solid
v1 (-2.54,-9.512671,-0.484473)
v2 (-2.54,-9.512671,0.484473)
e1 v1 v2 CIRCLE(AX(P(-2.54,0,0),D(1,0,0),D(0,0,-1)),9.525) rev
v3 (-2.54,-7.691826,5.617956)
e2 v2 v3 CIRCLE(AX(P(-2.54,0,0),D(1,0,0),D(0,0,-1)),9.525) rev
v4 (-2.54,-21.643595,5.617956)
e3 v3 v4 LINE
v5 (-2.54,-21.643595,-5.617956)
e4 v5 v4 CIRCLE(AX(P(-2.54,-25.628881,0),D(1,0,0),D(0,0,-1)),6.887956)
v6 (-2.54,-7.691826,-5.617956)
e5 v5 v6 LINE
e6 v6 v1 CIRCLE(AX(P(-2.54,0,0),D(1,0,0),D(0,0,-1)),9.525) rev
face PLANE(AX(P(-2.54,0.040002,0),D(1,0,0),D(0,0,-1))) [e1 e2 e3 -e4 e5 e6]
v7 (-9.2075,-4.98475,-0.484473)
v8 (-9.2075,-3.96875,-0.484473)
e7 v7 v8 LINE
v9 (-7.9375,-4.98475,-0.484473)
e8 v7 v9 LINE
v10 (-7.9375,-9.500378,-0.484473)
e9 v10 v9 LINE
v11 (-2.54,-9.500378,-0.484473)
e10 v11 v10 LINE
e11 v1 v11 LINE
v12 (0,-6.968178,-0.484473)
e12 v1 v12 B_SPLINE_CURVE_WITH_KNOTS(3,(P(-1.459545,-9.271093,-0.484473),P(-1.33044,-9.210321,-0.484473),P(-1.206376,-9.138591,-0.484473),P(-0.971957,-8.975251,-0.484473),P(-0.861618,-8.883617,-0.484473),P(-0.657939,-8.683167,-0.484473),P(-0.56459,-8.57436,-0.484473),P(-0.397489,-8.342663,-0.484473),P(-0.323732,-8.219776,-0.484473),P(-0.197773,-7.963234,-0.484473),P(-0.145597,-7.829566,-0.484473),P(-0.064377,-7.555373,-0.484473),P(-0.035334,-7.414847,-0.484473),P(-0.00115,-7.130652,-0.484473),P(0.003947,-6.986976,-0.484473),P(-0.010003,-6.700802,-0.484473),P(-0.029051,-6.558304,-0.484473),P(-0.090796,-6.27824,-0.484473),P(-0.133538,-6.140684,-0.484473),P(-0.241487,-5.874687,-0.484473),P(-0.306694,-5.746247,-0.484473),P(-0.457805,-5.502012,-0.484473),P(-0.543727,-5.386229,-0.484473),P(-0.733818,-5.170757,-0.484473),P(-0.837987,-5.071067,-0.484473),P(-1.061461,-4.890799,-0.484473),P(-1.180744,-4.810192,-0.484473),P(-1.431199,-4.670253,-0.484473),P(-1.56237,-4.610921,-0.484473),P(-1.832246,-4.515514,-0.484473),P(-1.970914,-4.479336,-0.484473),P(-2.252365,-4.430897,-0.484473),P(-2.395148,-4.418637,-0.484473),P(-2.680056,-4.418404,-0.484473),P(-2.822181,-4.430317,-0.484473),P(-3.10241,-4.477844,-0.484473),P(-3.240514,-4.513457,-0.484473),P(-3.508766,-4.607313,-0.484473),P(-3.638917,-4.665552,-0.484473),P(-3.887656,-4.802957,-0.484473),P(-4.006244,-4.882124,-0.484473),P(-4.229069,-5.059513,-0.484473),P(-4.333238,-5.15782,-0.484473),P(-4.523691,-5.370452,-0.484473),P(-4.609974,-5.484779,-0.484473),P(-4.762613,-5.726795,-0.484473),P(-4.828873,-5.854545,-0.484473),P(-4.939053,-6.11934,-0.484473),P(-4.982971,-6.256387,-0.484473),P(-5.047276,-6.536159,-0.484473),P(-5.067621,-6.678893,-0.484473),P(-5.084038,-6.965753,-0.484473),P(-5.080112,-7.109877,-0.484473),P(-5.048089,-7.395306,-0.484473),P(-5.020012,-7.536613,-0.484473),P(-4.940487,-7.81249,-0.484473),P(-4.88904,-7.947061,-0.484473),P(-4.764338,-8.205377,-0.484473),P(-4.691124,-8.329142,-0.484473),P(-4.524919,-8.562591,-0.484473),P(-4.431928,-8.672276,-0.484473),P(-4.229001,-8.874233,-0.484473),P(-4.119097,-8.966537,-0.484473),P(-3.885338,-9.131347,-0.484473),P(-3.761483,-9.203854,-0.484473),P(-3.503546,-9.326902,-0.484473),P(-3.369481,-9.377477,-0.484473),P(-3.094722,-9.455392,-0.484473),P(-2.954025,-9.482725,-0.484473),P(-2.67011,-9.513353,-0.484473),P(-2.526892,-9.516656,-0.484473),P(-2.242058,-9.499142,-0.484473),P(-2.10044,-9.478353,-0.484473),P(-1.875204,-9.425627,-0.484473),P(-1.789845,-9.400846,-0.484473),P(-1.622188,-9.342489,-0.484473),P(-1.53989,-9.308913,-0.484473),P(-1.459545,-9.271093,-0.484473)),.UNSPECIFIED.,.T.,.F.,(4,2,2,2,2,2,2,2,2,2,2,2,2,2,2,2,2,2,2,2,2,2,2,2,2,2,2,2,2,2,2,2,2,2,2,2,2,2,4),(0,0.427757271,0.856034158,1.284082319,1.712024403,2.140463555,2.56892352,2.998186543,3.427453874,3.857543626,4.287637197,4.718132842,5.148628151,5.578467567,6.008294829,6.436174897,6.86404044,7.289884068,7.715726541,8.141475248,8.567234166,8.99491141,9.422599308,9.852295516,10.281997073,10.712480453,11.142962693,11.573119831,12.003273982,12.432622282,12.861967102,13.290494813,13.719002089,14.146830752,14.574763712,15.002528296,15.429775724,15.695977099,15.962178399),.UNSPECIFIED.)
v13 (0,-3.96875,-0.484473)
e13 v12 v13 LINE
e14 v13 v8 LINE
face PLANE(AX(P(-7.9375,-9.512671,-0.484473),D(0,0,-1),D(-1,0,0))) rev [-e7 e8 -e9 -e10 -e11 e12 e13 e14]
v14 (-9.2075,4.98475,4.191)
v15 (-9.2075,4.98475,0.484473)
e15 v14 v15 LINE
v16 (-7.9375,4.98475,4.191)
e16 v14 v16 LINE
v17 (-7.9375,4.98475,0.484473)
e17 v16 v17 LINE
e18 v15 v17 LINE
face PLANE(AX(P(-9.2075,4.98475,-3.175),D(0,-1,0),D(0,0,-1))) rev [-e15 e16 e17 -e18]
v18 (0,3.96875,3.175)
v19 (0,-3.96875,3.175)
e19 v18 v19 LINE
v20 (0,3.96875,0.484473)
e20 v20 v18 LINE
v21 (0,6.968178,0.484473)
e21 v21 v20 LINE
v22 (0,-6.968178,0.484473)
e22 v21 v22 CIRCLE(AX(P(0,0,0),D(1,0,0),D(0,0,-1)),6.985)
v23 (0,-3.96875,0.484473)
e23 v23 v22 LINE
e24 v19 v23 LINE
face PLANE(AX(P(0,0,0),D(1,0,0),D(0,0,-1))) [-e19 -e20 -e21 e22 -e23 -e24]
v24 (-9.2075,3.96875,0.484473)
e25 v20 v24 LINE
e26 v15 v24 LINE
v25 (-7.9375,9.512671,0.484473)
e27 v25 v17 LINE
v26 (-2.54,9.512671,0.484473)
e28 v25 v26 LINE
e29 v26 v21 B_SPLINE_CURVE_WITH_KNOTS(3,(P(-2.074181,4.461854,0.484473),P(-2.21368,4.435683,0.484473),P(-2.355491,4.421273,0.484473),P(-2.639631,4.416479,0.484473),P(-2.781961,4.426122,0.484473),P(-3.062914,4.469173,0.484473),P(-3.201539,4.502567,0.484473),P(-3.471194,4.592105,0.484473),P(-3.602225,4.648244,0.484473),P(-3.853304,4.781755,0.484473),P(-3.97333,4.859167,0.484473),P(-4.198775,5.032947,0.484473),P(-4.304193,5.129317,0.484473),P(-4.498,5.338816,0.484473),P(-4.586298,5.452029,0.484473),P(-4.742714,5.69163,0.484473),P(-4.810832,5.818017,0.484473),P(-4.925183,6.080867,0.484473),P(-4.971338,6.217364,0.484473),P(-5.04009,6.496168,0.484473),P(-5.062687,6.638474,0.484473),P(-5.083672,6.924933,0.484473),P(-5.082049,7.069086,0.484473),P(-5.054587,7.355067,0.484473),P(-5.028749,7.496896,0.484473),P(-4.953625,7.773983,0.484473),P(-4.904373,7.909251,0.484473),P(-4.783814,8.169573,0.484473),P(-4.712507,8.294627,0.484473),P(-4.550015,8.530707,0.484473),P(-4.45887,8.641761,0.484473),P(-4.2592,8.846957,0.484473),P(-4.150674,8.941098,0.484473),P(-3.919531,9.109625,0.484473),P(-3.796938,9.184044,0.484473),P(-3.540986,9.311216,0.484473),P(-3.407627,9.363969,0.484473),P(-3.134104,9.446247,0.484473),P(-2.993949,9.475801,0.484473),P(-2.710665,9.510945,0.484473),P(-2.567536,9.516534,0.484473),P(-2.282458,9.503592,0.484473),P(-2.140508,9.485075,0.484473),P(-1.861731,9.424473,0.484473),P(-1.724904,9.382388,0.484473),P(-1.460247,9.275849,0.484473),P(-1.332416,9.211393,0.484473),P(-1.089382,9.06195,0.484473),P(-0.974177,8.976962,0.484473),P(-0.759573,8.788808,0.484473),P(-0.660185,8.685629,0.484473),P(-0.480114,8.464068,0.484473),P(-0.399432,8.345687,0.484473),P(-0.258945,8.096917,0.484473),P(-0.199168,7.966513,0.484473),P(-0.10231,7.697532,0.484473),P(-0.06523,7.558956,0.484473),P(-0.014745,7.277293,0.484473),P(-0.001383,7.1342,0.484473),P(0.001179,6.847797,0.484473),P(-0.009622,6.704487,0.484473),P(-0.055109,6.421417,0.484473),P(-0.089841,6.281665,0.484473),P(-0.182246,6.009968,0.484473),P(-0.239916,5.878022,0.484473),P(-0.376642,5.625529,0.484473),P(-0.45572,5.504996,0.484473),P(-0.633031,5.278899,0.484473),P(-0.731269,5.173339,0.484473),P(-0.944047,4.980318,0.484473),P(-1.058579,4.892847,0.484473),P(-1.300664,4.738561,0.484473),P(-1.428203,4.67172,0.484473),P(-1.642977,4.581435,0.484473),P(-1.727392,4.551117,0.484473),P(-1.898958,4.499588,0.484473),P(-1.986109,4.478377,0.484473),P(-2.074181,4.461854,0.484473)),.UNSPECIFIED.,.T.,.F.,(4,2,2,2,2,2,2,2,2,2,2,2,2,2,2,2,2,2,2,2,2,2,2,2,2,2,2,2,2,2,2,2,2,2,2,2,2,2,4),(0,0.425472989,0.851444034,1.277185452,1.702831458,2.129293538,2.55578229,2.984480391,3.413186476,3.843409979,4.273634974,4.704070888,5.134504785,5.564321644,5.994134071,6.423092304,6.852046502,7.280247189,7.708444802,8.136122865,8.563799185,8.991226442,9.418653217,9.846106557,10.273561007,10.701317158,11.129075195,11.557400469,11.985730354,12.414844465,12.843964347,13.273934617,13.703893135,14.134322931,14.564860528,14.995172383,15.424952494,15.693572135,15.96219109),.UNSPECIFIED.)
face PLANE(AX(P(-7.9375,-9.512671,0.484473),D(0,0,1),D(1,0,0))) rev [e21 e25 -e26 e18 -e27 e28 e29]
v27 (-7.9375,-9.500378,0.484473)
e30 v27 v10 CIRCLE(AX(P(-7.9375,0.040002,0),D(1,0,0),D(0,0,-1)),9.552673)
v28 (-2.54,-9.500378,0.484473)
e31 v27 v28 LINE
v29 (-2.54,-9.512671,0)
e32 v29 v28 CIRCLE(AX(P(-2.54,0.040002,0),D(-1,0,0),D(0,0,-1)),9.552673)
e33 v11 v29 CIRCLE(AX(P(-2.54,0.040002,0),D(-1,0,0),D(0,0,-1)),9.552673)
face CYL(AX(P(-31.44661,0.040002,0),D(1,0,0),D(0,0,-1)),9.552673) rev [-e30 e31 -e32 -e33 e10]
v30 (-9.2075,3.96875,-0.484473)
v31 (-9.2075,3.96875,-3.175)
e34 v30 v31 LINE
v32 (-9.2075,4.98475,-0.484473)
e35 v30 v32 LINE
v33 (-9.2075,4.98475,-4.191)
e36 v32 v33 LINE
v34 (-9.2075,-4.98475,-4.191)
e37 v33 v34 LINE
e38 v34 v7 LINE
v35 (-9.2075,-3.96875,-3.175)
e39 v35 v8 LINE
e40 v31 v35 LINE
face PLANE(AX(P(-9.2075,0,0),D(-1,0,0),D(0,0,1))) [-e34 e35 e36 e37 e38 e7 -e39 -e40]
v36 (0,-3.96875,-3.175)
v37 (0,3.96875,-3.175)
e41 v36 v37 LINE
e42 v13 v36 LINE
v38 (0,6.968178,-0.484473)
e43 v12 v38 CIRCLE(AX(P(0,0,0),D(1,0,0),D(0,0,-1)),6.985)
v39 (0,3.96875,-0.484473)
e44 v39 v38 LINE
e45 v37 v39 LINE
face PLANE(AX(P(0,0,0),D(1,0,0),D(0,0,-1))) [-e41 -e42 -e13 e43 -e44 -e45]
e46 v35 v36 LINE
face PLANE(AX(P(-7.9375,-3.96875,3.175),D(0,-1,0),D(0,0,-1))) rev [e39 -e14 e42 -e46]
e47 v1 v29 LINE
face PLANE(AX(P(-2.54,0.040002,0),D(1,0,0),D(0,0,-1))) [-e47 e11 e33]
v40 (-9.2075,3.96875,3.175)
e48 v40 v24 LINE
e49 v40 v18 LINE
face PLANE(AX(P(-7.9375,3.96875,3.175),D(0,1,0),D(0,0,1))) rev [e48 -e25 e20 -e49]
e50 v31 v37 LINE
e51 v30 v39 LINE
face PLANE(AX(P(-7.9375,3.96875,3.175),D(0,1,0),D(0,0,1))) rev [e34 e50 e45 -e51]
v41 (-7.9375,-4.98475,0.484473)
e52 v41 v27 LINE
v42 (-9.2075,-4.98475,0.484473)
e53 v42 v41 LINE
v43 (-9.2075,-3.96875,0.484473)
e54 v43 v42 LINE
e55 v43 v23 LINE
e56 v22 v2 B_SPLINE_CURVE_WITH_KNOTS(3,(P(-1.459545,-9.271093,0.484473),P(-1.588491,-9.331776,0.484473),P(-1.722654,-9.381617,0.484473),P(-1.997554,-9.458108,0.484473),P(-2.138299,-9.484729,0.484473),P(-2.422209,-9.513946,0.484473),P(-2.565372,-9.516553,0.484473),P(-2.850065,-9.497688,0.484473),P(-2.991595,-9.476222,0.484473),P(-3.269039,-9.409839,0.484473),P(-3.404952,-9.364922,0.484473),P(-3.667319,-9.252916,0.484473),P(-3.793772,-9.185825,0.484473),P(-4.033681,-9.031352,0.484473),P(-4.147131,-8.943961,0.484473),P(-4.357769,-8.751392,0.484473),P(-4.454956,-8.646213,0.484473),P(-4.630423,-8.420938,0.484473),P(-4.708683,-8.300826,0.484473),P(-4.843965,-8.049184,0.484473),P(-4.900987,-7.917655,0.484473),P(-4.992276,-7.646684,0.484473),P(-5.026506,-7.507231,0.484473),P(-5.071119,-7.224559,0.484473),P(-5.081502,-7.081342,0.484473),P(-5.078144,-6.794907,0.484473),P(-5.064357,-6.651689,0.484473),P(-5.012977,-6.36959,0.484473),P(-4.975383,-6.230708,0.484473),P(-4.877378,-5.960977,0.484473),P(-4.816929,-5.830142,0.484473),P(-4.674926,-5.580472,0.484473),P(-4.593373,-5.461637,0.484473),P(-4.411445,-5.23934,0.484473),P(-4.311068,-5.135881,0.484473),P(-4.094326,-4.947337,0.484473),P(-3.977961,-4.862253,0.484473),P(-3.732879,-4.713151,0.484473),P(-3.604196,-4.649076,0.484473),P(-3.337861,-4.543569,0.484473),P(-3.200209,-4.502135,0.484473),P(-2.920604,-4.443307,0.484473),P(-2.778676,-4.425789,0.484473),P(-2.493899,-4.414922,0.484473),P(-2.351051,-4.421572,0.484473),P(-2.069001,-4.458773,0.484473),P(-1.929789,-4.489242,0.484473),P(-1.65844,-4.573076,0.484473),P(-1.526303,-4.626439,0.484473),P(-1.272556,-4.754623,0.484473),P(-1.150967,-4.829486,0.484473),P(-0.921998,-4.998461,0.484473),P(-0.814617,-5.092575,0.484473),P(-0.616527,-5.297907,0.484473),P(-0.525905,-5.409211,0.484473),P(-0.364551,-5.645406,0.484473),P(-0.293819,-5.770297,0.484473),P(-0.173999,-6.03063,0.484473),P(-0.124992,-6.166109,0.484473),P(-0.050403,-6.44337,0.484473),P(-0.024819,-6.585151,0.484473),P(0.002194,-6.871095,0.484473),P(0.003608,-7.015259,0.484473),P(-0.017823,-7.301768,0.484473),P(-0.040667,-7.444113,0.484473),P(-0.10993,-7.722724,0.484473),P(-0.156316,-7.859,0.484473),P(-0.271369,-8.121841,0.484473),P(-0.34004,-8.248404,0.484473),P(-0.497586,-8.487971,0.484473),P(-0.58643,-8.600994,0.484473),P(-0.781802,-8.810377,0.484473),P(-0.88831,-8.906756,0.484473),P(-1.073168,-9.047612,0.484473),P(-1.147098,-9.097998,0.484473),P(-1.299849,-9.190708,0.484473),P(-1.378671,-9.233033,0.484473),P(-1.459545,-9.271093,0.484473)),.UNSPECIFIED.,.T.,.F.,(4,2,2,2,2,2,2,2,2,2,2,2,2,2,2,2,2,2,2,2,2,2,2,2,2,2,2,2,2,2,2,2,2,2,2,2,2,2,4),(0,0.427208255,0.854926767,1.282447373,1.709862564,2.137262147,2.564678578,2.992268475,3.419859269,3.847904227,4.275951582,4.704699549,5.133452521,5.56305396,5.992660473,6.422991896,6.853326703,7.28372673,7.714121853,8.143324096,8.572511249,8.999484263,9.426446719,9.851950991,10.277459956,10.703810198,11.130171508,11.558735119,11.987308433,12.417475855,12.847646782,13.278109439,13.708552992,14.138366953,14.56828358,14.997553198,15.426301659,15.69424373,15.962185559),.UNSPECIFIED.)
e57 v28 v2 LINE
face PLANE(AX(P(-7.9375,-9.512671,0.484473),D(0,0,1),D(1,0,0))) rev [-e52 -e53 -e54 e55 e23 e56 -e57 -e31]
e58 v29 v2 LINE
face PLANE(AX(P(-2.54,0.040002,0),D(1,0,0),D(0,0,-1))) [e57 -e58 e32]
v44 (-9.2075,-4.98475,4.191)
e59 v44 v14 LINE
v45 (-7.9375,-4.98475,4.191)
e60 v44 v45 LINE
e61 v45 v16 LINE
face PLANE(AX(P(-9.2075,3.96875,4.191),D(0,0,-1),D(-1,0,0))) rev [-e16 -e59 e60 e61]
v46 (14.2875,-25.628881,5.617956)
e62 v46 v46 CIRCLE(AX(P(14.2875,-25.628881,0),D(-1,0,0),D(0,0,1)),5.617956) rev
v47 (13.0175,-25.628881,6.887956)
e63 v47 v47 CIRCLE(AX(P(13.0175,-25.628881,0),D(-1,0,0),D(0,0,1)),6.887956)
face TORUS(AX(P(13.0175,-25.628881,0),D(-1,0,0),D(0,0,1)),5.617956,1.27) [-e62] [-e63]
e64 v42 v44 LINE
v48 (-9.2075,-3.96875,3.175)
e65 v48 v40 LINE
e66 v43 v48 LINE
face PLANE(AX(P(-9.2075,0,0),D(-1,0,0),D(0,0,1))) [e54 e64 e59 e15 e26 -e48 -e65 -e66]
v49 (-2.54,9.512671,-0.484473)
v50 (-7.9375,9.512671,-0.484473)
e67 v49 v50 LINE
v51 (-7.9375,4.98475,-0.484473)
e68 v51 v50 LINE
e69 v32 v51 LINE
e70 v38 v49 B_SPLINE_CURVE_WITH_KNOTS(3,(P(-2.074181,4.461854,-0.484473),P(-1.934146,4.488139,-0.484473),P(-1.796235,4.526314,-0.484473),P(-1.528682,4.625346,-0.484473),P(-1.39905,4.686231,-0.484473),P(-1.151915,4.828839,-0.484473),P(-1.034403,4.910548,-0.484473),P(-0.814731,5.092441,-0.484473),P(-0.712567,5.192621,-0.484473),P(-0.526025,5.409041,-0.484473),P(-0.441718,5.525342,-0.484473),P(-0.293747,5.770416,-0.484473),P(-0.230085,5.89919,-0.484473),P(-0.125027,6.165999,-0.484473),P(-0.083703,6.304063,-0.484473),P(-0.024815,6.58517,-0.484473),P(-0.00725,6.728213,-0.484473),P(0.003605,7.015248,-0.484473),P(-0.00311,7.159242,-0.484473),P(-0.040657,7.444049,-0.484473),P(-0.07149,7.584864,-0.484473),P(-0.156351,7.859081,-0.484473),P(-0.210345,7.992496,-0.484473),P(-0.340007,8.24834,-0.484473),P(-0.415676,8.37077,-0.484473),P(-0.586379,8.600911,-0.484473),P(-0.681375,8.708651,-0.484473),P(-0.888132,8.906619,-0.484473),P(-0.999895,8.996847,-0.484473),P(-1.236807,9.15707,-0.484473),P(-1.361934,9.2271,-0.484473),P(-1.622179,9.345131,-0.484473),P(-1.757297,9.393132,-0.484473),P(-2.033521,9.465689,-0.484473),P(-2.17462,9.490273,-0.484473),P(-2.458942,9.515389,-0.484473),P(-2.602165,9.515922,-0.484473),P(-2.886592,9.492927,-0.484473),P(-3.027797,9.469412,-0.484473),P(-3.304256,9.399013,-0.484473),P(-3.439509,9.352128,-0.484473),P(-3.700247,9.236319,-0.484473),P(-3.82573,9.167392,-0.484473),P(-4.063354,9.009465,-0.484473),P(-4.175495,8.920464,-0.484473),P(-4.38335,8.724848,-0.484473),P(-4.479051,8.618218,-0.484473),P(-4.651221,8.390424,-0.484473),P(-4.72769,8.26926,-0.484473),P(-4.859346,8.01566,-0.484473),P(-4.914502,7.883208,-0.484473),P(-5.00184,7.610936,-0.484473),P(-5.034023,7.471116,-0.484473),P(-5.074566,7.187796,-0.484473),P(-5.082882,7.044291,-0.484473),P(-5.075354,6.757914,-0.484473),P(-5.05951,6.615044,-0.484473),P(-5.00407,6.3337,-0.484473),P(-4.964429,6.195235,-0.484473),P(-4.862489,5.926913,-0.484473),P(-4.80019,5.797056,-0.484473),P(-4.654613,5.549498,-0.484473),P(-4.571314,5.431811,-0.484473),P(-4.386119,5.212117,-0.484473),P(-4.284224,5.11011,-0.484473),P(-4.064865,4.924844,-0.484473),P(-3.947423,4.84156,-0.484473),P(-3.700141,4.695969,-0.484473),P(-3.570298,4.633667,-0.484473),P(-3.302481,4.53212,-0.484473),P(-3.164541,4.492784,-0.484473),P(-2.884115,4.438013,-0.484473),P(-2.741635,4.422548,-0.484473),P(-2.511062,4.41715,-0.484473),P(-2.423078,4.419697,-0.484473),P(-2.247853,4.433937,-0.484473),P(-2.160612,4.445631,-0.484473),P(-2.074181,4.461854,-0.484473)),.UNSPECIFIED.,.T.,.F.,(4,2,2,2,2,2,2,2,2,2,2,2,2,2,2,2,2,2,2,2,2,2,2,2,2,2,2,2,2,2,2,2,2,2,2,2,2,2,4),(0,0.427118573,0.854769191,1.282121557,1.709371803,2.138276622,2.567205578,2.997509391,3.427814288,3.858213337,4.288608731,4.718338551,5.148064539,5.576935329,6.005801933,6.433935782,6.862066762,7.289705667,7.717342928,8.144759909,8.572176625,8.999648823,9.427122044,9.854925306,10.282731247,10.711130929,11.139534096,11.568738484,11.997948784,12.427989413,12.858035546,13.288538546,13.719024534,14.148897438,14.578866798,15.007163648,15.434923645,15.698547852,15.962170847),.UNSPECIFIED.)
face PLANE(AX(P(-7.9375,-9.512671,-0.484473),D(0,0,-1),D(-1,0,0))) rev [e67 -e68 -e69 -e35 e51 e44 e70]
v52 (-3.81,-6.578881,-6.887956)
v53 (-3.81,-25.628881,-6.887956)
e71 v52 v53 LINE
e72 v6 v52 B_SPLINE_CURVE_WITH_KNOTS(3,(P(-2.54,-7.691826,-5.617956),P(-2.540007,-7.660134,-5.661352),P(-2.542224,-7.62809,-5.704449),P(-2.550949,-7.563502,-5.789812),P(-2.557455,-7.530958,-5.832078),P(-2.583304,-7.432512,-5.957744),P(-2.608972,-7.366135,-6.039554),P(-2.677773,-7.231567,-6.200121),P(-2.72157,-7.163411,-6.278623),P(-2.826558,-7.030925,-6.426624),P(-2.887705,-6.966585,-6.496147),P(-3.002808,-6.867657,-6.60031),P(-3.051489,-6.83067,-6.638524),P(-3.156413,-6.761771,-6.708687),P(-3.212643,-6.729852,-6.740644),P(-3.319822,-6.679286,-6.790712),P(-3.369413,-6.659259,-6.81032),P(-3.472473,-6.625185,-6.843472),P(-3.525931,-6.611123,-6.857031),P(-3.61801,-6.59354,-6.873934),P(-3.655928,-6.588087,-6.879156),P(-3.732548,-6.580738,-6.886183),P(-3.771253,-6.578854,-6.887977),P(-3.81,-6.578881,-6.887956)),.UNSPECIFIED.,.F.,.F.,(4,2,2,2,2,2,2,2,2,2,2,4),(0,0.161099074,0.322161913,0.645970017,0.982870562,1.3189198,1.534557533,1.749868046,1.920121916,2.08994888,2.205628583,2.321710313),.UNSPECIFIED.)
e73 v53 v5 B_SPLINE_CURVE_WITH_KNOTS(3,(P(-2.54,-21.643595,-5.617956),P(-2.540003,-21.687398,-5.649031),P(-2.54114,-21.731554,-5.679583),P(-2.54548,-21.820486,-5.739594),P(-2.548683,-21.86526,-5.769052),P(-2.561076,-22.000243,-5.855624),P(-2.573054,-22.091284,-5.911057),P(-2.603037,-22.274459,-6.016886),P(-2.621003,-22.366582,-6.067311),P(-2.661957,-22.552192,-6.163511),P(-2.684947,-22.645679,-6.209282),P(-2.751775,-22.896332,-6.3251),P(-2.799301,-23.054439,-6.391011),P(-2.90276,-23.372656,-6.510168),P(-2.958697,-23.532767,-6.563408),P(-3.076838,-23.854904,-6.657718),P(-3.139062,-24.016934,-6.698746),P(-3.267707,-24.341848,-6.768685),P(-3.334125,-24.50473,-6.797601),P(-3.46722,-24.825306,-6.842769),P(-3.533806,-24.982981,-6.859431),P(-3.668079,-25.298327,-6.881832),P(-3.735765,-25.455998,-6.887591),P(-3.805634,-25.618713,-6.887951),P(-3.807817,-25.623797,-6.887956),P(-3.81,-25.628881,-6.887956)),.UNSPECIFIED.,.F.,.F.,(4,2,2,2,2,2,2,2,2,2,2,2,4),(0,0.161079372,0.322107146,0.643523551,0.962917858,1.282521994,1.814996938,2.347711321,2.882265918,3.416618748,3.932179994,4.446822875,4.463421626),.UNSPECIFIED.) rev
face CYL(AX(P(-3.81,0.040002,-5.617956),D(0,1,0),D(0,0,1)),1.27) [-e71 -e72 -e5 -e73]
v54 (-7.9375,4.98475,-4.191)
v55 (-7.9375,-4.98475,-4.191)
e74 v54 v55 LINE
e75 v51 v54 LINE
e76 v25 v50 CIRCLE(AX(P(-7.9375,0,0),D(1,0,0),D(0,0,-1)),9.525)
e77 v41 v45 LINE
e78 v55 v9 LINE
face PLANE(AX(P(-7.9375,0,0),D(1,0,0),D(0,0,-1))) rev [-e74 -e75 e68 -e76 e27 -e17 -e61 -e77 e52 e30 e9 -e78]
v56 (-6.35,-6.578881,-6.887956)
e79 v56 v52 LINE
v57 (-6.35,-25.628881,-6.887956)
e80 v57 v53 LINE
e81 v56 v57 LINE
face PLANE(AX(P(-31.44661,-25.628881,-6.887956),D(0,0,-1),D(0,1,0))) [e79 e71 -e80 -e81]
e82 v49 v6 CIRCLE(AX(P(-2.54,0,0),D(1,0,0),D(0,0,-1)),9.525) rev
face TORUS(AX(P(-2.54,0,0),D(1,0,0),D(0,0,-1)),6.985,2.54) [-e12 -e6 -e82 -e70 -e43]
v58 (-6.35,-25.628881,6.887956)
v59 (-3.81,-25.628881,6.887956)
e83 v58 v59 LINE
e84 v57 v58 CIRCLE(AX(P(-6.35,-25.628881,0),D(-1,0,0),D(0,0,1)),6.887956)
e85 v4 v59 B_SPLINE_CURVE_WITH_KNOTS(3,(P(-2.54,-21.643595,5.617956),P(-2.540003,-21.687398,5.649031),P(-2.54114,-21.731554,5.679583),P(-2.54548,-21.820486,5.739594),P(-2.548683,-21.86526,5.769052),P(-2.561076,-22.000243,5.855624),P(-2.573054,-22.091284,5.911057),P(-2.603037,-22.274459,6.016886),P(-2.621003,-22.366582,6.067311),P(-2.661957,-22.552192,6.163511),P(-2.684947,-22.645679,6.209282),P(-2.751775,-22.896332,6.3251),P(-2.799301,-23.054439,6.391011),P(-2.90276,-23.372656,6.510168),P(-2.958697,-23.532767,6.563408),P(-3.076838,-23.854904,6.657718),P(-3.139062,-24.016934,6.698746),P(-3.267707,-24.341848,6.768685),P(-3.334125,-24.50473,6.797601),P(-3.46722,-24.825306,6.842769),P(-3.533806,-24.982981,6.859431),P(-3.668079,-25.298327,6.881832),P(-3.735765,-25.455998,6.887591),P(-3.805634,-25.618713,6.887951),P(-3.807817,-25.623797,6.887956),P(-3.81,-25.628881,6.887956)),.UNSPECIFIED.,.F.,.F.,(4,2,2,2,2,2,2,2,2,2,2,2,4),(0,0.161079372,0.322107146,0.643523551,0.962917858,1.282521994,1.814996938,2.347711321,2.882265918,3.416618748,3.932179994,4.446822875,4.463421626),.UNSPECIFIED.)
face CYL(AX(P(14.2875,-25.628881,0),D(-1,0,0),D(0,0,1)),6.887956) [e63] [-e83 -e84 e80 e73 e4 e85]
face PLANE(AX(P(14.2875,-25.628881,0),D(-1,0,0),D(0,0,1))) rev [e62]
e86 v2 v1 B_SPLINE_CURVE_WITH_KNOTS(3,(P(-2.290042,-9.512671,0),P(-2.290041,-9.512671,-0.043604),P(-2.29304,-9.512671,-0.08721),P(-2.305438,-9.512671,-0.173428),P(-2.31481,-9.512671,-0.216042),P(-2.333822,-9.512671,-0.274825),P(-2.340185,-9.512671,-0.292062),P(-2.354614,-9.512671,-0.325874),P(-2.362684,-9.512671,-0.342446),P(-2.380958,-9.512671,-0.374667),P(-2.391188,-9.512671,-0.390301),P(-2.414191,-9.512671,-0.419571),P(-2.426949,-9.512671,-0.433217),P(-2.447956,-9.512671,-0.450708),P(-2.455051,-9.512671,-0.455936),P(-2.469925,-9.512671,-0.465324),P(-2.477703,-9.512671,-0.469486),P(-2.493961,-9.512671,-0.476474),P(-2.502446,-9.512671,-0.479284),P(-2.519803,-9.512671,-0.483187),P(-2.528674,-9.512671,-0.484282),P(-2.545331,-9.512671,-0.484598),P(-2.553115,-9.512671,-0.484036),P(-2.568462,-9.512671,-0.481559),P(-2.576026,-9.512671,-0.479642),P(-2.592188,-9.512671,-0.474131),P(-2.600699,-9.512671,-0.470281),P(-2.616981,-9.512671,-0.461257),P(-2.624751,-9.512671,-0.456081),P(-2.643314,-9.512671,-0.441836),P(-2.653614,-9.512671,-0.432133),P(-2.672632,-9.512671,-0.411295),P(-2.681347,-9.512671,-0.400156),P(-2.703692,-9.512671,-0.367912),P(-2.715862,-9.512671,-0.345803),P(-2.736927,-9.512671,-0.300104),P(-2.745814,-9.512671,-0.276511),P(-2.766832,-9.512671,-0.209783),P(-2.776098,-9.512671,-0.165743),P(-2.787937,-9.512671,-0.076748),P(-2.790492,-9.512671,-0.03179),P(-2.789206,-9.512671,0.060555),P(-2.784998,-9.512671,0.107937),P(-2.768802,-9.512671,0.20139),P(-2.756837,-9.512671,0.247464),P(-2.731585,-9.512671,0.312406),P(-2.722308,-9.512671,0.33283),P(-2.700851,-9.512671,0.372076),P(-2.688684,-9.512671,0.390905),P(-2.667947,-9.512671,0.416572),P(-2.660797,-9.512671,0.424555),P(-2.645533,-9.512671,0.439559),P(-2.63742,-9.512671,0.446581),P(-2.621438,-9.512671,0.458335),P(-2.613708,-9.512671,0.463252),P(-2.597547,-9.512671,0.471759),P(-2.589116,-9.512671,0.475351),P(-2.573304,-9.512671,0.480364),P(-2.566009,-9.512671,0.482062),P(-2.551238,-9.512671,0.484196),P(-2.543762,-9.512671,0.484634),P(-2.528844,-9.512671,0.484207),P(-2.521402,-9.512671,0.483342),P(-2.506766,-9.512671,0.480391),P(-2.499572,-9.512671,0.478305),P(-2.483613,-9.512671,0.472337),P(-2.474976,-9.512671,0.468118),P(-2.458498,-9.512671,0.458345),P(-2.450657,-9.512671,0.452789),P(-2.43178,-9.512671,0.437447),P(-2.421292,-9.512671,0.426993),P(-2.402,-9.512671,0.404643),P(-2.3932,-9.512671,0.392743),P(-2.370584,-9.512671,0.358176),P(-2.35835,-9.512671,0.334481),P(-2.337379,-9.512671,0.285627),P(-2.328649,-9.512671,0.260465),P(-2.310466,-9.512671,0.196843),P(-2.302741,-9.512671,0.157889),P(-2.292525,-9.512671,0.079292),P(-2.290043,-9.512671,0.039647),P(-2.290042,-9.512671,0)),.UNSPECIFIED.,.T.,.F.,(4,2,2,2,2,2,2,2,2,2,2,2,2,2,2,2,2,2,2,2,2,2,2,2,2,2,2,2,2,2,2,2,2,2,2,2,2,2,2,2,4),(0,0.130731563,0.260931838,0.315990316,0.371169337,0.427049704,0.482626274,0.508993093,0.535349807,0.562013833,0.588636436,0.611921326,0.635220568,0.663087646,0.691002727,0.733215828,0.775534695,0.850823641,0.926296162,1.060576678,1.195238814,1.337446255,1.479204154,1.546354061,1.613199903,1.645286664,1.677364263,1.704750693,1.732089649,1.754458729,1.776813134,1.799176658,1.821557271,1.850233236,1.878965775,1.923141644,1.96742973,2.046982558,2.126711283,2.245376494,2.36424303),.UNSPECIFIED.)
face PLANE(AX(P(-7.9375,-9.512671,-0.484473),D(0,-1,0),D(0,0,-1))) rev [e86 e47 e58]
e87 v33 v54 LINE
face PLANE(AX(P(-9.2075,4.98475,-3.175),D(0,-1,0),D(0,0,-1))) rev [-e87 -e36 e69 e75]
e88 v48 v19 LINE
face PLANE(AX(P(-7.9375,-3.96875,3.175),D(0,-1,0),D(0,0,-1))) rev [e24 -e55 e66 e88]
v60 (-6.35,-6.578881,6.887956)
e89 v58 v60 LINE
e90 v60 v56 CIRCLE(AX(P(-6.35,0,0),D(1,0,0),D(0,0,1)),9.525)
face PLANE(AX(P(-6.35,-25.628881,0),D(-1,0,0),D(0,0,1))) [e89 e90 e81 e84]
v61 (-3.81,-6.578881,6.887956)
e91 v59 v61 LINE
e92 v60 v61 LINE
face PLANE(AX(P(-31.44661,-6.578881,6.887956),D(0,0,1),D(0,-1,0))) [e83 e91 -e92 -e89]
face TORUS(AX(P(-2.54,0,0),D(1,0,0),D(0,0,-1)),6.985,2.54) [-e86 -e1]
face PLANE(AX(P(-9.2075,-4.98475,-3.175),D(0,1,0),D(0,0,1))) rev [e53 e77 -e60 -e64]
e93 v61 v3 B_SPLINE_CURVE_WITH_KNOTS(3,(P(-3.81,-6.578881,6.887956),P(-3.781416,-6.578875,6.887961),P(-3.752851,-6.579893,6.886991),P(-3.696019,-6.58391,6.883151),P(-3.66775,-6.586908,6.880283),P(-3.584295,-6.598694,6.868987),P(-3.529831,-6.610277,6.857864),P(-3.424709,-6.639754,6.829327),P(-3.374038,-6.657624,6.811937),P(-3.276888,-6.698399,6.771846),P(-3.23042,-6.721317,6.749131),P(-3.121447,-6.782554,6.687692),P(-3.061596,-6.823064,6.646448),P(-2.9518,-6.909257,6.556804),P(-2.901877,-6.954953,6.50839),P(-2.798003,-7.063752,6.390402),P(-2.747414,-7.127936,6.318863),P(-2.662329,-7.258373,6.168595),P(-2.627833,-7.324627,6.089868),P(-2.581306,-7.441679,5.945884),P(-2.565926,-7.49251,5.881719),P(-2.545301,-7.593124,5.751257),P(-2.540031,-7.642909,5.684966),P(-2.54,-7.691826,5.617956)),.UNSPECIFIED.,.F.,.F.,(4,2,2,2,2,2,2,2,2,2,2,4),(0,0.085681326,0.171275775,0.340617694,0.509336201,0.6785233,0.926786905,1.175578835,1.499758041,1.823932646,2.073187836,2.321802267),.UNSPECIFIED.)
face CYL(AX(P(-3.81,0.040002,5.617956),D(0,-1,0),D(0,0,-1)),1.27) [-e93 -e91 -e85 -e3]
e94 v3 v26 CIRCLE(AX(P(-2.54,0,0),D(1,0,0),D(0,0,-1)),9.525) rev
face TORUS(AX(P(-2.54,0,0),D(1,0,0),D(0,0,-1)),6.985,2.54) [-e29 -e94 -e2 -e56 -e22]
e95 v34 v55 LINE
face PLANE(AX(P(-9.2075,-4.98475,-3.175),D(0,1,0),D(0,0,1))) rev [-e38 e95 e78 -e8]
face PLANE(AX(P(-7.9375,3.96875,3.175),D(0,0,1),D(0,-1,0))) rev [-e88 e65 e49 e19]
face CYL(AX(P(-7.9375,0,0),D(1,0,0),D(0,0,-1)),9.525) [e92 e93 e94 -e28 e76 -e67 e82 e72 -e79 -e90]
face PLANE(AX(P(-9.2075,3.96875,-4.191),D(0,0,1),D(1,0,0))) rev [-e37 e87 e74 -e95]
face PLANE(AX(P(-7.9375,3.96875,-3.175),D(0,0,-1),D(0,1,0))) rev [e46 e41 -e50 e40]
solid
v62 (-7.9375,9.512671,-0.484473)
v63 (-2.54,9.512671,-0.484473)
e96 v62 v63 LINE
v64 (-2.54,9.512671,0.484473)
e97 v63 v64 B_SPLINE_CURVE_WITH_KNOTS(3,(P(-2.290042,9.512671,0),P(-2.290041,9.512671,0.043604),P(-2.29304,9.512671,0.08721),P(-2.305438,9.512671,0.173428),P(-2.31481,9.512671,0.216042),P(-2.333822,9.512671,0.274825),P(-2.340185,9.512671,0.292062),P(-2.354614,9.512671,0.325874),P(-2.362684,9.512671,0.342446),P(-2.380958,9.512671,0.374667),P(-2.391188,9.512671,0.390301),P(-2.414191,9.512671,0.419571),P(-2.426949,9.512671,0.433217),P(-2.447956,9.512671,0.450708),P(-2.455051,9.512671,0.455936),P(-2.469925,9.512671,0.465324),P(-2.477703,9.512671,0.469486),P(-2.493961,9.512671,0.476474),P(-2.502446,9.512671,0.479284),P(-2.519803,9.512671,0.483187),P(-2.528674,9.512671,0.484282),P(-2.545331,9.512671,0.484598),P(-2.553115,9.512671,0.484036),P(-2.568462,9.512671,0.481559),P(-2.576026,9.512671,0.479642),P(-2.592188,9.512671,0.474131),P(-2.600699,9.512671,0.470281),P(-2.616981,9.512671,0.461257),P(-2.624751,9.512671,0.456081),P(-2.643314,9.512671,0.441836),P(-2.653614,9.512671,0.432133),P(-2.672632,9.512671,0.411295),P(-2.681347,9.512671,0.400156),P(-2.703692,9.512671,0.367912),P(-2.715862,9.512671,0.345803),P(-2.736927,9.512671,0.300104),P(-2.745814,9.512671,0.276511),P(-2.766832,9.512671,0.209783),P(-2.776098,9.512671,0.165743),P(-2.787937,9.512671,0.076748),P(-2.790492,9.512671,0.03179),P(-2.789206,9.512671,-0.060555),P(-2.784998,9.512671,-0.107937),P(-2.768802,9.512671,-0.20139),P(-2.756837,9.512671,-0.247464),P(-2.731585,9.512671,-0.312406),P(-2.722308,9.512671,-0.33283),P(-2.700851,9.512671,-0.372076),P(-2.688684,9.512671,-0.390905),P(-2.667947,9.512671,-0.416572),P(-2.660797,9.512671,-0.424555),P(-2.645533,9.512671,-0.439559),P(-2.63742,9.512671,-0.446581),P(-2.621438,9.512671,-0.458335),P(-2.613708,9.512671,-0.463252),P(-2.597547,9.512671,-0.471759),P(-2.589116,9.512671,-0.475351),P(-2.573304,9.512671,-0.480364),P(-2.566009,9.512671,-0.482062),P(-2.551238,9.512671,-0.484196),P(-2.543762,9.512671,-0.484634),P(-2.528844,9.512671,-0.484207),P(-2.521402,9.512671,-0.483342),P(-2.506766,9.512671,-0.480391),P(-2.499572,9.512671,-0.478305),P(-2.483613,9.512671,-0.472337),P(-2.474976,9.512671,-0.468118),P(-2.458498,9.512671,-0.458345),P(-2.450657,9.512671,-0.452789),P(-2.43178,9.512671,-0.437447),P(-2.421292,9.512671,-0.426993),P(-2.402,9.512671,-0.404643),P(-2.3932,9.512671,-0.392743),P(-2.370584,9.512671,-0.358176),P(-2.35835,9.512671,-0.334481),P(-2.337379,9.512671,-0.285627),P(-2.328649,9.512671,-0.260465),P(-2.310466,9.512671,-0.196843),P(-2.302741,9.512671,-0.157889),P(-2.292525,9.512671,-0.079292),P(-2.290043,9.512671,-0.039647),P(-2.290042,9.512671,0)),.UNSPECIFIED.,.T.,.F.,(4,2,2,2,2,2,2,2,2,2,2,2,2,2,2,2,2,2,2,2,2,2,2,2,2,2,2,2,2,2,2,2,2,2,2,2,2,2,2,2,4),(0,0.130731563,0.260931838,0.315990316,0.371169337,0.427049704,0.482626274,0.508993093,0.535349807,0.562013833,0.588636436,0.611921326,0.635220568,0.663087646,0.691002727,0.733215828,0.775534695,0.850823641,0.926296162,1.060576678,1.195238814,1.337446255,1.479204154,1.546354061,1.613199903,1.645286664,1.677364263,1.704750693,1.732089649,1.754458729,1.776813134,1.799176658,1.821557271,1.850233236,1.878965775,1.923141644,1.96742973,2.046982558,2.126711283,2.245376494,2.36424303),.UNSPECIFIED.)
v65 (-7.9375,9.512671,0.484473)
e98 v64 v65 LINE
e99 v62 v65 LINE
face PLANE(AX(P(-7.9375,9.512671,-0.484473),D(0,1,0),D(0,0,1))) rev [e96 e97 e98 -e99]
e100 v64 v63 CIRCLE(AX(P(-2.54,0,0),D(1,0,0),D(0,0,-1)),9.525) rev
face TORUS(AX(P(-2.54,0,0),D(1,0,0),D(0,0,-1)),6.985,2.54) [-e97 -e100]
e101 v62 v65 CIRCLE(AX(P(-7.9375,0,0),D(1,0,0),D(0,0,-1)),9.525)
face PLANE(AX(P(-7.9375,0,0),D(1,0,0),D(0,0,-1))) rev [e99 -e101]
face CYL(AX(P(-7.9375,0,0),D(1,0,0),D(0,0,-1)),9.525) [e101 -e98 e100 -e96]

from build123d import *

# Parameters (mm, degrees)
SKETCH1_R            = 9.525
BOSS_EXTRUDE1_DEPTH  = 7.9375
FILLET1_R            = 2.54
SKETCH4_W            = 0.968946332
SKETCH4_H            = 19.025342126
CUT_EXTRUDE1_DEPTH   = 16.63506176
SKETCH6_W            = 6.35
SKETCH6_H            = 7.9375
CUT_EXTRUDE2_DEPTH   = 16.635061933
BOSS_EXTRUDE10_DEPTH = 5.3975
SKETCH11_R           = 6.887956427
BOSS_EXTRUDE12_DEPTH = 22.225
FILLET2_R            = 1.27
CUT_EXTRUDE3_START   = -1.5875
CUT_EXTRUDE3_DEPTH   = 1.5875
SKETCH13_W           = 8.382
SKETCH13_H           = 9.9695
SKETCH13_W_2         = 6.35
SKETCH13_H_2         = 7.9375
EXTRUDE_THIN1_DEPTH  = 1.27
SKETCH14_W           = 0.968946332
SKETCH14_H           = 9.9695
CUT_EXTRUDE4_DEPTH   = 37.77231348


with BuildPart() as part:
    # Sketch1 → Boss-Extrude1 (new body)
    with BuildSketch(Plane(origin=(0, 0, 0), x_dir=(0, 0, -1), z_dir=(1, 0, 0))):
        Circle(SKETCH1_R)
    extrude(amount=-BOSS_EXTRUDE1_DEPTH)

    # Fillet1
    fillet1_edges = [part.edges().sort_by_distance(p)[0] for p in [
        (0, 0, 9.525),
    ]]
    fillet(fillet1_edges, radius=FILLET1_R)

    # Sketch4 → Cut-Extrude1 (cut, through all)
    with BuildSketch(Plane(origin=(0, 0, 0), x_dir=(0, 0, -1), z_dir=(1, 0, 0))):
        Rectangle(SKETCH4_W, SKETCH4_H)
    extrude(amount=-CUT_EXTRUDE1_DEPTH, mode=Mode.SUBTRACT)

    # Sketch6 → Cut-Extrude2 (cut, through all)
    with BuildSketch(Plane(origin=(0, 0, 0), x_dir=(0, 0, -1), z_dir=(1, 0, 0))):
        Rectangle(SKETCH6_W, SKETCH6_H)
    extrude(amount=-CUT_EXTRUDE2_DEPTH, mode=Mode.SUBTRACT)

    # Sketch8 → Boss-Extrude10 (add)
    with BuildSketch(Plane(origin=(-2.54, 0, 0), x_dir=(0, 0, -1), z_dir=(1, 0, 0))):
        with BuildLine():
            Line((-6.887956427, -6.578881459), (-6.887956427, -25.628881459))
            Line((-6.887956427, -25.628881459), (6.887956427, -25.628881459))
            Line((6.887956427, -25.628881459), (6.887956427, -6.578881459))
            ThreePointArc((6.887956427, -6.578881459), (0, -9.512671063), (-6.887956427, -6.578881459))
        make_face()
    extrude(amount=-BOSS_EXTRUDE10_DEPTH)

    # Sketch11 → Boss-Extrude12 (add)
    with BuildSketch(Plane.ZY.offset(7.9375)):
        with Locations((0, -25.628881459)):
            Circle(SKETCH11_R)
    extrude(amount=-BOSS_EXTRUDE12_DEPTH)

    # Fillet2
    # the kernel refuses this fillet: 1.27 mm, written as the material it takes off along each edge
    with BuildSketch(Plane(origin=(14.2875, -25.628881459, 0), x_dir=(0, 0, 1), z_dir=(0, -1, 0))) as fillet2_piece_1:
        with BuildLine():
            CenterArc((6.887956427 - FILLET2_R, FILLET2_R), FILLET2_R, 270, 90)
            Line((6.887956427 - FILLET2_R, 0), (6.887956427, 0))
            Line((6.887956427, 0), (6.887956427, FILLET2_R))
        make_face()
    revolve(axis=Axis((14.2875, -25.628881459, 0), (-1, 0, 0)), mode=Mode.SUBTRACT)
    with BuildSketch(Plane(origin=(-2.54, -3.403881459, 6.887956427), x_dir=(-1, 0, 0), z_dir=(0, -1, 0))) as fillet2_piece_2_section:
        with BuildLine():
            CenterArc((FILLET2_R, FILLET2_R), FILLET2_R, 180, 90)
            Line((0, FILLET2_R), (0, 0))
            Line((0, 0), (FILLET2_R, 0))
        make_face()
    fillet2_piece_2 = extrude(amount=25.4, mode=Mode.PRIVATE)
    fillet2_piece_2 = fillet2_piece_2 - Plane(origin=(-2.832756395, 0, 0), x_dir=(0, 0, -1), z_dir=(1, 0, 0)) * Cylinder(9.525, 56, mode=Mode.PRIVATE)
    fillet2_piece_2 = fillet2_piece_2 - Plane(origin=(-2.832756395, -25.628881459, 0), x_dir=(0, 0, 1), z_dir=(-1, 0, 0)) * Cylinder(6.887956427, 56, mode=Mode.PRIVATE)
    add(fillet2_piece_2, mode=Mode.SUBTRACT)
    with BuildSketch(Plane(origin=(-2.54, -28.803881459, -6.887956427), x_dir=(-1, 0, 0), z_dir=(0, 1, 0))) as fillet2_piece_3_section:
        with BuildLine():
            CenterArc((FILLET2_R, FILLET2_R), FILLET2_R, 180, 90)
            Line((0, FILLET2_R), (0, 0))
            Line((0, 0), (FILLET2_R, 0))
        make_face()
    fillet2_piece_3 = extrude(amount=25.4, mode=Mode.PRIVATE)
    fillet2_piece_3 = fillet2_piece_3 - Plane(origin=(-2.83275673, 0, 0), x_dir=(0, 0, -1), z_dir=(1, 0, 0)) * Cylinder(9.525, 56, mode=Mode.PRIVATE)
    fillet2_piece_3 = fillet2_piece_3 - Plane(origin=(-2.83275673, -25.628881459, 0), x_dir=(0, 0, 1), z_dir=(-1, 0, 0)) * Cylinder(6.887956427, 56, mode=Mode.PRIVATE)
    add(fillet2_piece_3, mode=Mode.SUBTRACT)

    # Sketch12 → Cut-Extrude3 (cut)
    with BuildSketch(Plane.ZY.offset(7.9375).offset(CUT_EXTRUDE3_START)):
        with BuildLine():
            Line((-6.887956427, -25.628881459), (-6.887956427, -6.578881459))
            ThreePointArc((-6.887956427, -6.578881459), (0, -9.525), (6.887956427, -6.578881459))
            Line((6.887956427, -6.578881459), (6.887956427, -25.628881459))
            ThreePointArc((6.887956427, -25.628881459), (0, -32.516837887), (-6.887956427, -25.628881459))
        make_face()
    extrude(amount=CUT_EXTRUDE3_DEPTH, mode=Mode.SUBTRACT)

    # Sketch13 → Extrude-Thin1 (add)
    with BuildSketch(Plane.ZY.offset(7.9375)):
        Rectangle(SKETCH13_W, SKETCH13_H)
        Rectangle(SKETCH13_W_2, SKETCH13_H_2, mode=Mode.SUBTRACT)
    extrude(amount=EXTRUDE_THIN1_DEPTH)

    # Sketch14 → Cut-Extrude4 (cut, through all)
    with BuildSketch(Plane(origin=(0, 0, 0), x_dir=(0, 0, -1), z_dir=(1, 0, 0))):
        Rectangle(SKETCH14_W, SKETCH14_H)
    extrude(amount=-CUT_EXTRUDE4_DEPTH, mode=Mode.SUBTRACT)


solid = part.part
